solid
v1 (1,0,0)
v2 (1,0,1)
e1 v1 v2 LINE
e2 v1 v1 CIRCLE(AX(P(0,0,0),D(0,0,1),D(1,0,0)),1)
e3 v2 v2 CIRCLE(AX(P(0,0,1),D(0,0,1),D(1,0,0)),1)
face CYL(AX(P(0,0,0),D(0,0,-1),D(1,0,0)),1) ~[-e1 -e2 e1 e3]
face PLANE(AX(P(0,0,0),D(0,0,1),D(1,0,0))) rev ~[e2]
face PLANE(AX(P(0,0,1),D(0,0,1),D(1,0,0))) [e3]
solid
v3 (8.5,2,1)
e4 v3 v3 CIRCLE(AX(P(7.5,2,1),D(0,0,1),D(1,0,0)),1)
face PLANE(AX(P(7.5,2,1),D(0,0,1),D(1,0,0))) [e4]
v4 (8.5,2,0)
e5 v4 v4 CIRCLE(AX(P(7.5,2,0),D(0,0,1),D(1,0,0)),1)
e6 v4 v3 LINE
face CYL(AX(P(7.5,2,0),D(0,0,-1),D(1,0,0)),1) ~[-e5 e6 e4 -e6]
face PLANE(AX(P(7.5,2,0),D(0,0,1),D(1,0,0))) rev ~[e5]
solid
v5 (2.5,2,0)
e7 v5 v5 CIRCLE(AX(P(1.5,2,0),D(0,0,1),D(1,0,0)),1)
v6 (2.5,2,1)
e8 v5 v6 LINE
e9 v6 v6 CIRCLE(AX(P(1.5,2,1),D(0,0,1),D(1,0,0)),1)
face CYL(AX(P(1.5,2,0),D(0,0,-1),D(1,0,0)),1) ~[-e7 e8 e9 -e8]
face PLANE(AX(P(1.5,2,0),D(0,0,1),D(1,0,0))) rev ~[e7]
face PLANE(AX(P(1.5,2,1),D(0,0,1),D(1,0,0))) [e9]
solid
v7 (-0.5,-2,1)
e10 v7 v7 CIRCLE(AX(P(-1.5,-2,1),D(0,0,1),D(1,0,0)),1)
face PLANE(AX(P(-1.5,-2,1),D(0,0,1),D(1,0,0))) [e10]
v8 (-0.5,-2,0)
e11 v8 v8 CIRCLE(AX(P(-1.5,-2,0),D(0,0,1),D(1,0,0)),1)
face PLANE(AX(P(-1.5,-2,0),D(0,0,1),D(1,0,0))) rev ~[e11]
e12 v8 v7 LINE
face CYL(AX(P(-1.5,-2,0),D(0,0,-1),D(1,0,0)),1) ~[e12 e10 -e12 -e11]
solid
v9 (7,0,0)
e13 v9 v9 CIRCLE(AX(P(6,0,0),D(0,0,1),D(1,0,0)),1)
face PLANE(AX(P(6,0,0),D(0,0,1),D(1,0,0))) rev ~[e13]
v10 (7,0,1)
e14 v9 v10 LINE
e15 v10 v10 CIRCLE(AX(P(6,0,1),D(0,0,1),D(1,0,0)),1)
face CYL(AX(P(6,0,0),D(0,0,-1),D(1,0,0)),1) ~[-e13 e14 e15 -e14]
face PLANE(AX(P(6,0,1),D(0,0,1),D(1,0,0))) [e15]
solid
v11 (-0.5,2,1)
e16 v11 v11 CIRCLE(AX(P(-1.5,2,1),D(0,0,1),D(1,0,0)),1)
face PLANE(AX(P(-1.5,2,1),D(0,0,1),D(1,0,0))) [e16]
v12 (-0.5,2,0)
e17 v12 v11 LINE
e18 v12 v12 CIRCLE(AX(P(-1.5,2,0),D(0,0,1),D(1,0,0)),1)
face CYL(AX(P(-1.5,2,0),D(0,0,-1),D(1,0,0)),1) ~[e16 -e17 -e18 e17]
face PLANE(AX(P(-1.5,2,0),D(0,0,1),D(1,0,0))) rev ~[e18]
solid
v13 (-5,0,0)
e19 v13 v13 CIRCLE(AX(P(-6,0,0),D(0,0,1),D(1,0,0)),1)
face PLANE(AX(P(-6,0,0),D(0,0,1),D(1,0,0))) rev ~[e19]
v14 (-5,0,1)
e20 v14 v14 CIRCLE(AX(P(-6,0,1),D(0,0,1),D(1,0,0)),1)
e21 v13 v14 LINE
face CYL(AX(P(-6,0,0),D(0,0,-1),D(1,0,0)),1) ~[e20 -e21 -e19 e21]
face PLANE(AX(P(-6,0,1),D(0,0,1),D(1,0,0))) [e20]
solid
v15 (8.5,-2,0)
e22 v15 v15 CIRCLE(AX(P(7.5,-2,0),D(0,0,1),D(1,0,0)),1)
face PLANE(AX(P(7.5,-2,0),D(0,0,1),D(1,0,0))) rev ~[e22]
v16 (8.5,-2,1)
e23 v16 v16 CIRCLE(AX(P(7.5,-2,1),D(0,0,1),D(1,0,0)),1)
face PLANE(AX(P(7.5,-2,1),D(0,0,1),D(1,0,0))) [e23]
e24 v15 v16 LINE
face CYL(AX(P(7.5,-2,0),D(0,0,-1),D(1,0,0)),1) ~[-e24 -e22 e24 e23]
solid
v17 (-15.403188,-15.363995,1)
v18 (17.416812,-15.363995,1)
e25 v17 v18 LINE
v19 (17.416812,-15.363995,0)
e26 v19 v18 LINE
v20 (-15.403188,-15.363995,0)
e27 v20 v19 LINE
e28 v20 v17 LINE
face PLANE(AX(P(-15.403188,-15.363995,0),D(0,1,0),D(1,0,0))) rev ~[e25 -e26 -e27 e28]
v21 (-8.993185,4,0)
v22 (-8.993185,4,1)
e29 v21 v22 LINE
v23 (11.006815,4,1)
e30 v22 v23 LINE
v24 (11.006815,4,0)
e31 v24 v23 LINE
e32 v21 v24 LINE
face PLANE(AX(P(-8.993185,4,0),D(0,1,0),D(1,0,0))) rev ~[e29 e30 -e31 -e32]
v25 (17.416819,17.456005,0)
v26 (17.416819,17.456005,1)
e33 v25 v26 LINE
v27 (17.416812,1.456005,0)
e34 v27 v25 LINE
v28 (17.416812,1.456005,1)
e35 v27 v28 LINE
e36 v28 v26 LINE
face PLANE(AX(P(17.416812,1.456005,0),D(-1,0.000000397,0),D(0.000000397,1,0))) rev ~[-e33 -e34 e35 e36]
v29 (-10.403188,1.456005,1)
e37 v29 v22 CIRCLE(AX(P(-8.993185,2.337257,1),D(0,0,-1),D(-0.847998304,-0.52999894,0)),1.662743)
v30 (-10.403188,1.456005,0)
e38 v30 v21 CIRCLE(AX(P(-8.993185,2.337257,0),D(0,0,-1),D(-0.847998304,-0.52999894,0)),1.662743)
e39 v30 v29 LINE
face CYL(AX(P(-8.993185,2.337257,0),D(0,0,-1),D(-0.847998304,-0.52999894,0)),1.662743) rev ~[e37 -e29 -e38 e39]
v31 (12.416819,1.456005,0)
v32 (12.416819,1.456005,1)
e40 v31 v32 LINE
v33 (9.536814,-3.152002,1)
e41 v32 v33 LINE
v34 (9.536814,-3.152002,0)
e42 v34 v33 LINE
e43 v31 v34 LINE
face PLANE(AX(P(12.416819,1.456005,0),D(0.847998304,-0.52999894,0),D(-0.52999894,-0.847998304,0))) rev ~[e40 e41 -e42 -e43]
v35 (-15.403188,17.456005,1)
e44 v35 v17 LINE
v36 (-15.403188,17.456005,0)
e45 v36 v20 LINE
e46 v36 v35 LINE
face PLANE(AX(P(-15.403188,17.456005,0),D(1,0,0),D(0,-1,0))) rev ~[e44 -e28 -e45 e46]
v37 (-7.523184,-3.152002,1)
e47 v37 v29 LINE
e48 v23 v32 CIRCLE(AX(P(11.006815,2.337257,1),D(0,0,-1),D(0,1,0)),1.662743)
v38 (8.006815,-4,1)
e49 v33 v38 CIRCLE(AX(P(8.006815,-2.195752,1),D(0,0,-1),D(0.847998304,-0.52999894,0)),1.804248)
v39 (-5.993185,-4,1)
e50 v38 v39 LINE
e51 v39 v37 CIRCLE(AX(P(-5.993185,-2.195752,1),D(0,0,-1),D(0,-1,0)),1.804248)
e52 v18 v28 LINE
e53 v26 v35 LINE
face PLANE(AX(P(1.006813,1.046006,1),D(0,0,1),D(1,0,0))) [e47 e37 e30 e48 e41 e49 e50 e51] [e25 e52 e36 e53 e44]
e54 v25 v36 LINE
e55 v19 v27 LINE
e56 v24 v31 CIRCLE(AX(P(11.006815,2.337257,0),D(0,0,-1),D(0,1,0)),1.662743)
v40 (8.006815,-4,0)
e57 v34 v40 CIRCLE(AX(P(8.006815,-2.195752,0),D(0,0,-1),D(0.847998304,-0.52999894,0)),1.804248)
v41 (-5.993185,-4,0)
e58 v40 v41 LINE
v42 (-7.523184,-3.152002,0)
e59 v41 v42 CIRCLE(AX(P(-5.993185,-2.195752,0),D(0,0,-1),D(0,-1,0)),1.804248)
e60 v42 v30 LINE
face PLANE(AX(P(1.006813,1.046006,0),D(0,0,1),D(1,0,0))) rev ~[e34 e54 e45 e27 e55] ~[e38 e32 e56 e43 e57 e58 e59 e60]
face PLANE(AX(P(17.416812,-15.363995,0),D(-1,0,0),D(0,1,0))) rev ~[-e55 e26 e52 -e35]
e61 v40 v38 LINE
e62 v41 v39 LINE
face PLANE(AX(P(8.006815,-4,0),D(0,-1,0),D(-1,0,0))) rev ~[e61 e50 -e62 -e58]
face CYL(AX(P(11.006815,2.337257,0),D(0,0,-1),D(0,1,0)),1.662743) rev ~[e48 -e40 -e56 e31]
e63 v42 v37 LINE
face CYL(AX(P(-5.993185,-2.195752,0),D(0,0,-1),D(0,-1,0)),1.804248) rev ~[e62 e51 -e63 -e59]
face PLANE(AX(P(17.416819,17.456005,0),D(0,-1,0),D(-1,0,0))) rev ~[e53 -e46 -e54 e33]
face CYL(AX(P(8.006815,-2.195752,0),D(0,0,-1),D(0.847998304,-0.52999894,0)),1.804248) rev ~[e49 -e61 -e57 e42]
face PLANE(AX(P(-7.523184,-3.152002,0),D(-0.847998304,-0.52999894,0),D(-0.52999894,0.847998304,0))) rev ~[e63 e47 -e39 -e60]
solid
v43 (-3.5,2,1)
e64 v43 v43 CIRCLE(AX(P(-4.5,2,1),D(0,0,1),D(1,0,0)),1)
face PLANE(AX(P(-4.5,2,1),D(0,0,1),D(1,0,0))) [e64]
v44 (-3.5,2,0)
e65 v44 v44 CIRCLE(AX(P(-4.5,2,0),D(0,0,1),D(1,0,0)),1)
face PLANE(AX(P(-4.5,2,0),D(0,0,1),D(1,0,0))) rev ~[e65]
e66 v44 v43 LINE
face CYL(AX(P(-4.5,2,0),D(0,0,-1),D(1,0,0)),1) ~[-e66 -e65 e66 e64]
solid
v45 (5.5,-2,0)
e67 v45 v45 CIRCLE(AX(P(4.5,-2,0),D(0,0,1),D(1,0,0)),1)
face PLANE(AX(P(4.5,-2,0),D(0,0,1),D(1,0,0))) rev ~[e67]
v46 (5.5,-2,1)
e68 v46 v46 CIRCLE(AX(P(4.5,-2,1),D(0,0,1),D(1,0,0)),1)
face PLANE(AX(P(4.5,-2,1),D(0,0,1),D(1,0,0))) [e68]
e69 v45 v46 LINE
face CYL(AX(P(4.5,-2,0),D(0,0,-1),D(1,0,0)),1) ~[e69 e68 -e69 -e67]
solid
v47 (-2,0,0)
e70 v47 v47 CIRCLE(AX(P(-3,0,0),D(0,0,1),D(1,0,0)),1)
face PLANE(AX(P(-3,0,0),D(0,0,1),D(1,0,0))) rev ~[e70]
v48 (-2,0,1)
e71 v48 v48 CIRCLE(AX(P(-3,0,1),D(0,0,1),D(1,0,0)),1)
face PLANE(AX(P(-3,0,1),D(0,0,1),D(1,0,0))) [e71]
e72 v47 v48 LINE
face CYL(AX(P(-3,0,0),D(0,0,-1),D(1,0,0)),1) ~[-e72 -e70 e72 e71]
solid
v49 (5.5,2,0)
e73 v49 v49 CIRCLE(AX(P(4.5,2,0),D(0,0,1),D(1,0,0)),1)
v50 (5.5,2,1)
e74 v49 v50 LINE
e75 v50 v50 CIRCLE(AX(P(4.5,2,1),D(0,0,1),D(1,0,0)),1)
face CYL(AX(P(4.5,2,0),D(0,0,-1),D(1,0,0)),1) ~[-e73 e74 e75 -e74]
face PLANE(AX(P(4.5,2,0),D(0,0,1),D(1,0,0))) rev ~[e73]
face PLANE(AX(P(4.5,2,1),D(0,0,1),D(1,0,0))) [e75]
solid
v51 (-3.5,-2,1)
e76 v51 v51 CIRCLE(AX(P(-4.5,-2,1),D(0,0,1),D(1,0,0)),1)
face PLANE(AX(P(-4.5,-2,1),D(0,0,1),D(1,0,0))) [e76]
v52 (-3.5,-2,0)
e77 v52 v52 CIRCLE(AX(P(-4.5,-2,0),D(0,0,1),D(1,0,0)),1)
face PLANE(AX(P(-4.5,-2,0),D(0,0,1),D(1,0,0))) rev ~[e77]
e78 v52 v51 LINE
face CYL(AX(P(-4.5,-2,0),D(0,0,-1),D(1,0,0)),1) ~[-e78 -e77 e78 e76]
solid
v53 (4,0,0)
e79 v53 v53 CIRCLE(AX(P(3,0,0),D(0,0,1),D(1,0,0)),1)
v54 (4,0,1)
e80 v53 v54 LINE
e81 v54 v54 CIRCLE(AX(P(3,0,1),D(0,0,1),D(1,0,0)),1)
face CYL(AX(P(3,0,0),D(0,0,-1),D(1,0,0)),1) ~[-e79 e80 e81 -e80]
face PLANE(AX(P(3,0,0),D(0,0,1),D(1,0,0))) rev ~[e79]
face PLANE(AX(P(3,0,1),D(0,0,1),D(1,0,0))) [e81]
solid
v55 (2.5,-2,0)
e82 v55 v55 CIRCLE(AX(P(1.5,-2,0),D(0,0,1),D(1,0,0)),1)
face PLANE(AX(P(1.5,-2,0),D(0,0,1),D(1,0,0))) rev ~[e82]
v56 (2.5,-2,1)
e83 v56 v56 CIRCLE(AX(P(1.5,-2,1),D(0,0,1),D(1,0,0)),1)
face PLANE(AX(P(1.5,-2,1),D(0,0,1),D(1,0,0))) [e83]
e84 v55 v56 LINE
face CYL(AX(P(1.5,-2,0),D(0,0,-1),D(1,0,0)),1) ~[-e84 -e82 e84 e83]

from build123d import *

# Parameters (mm, degrees)
F0_R     = 1
F1_DEPTH = 1
F2_DEPTH = 1


# Not quite as in the source:
# - ends of sketch curves that miss each other by under 0.0002 mm in the source are joined


with BuildPart() as f1:
    # F0 (on Top) → F1 (new body)
    with BuildSketch(Plane.XY):
        with Locations((-4.5, 2)):
            Circle(F0_R)
    extrude(amount=F1_DEPTH)


with BuildPart() as f1b:
    # F0 (on Top) → F1, piece 2 (new body)
    with BuildSketch(Plane.XY):
        with Locations((-1.5, 2)):
            Circle(F0_R)
    extrude(amount=F1_DEPTH)


with BuildPart() as f1c:
    # F0 (on Top) → F1, piece 3 (new body)
    with BuildSketch(Plane.XY):
        with Locations((1.5, 2)):
            Circle(F0_R)
    extrude(amount=F1_DEPTH)


with BuildPart() as f1d:
    # F0 (on Top) → F1, piece 4 (new body)
    with BuildSketch(Plane.XY):
        with Locations((4.5, 2)):
            Circle(F0_R)
    extrude(amount=F1_DEPTH)


with BuildPart() as f1e:
    # F0 (on Top) → F1, piece 5 (new body)
    with BuildSketch(Plane.XY):
        with Locations((7.5, 2)):
            Circle(F0_R)
    extrude(amount=F1_DEPTH)


with BuildPart() as f1f:
    # F0 (on Top) → F1, piece 6 (new body)
    with BuildSketch(Plane.XY):
        with Locations((6, 0)):
            Circle(F0_R)
    extrude(amount=F1_DEPTH)


with BuildPart() as f1g:
    # F0 (on Top) → F1, piece 7 (new body)
    with BuildSketch(Plane.XY):
        with Locations((3, 0)):
            Circle(F0_R)
    extrude(amount=F1_DEPTH)


with BuildPart() as f1h:
    # F0 (on Top) → F1, piece 8 (new body)
    with BuildSketch(Plane.XY):
        Circle(F0_R)
    extrude(amount=F1_DEPTH)


with BuildPart() as f1i:
    # F0 (on Top) → F1, piece 9 (new body)
    with BuildSketch(Plane.XY):
        with Locations((-3, 0)):
            Circle(F0_R)
    extrude(amount=F1_DEPTH)


with BuildPart() as f1j:
    # F0 (on Top) → F1, piece 10 (new body)
    with BuildSketch(Plane.XY):
        with Locations((-6, 0)):
            Circle(F0_R)
    extrude(amount=F1_DEPTH)


with BuildPart() as f1k:
    # F0 (on Top) → F1, piece 11 (new body)
    with BuildSketch(Plane.XY):
        with Locations((-4.5, -2)):
            Circle(F0_R)
    extrude(amount=F1_DEPTH)


with BuildPart() as f1l:
    # F0 (on Top) → F1, piece 12 (new body)
    with BuildSketch(Plane.XY):
        with Locations((-1.5, -2)):
            Circle(F0_R)
    extrude(amount=F1_DEPTH)


with BuildPart() as f1m:
    # F0 (on Top) → F1, piece 13 (new body)
    with BuildSketch(Plane.XY):
        with Locations((1.5, -2)):
            Circle(F0_R)
    extrude(amount=F1_DEPTH)


with BuildPart() as f1n:
    # F0 (on Top) → F1, piece 14 (new body)
    with BuildSketch(Plane.XY):
        with Locations((4.5, -2)):
            Circle(F0_R)
    extrude(amount=F1_DEPTH)


with BuildPart() as f1o:
    # F0 (on Top) → F1, piece 15 (new body)
    with BuildSketch(Plane.XY):
        with Locations((7.5, -2)):
            Circle(F0_R)
    extrude(amount=F1_DEPTH)


with BuildPart() as f2:
    # F0 (on Top) → F2 (new body)
    with BuildSketch(Plane.XY):
        Polygon((17.4168121663, -15.363994912), (17.4168121663, 1.456005088), (17.4168185263, 17.456005088), (-15.4031878337, 17.456005088), (-15.4031878337, -15.363994912), align=None)
        with BuildLine():
            Line((-8.9931846537, 4), (0.0068153463, 4))
            Line((0.0068153463, 4), (11.0068153463, 4))
            ThreePointArc((11.0068153463, 4), (12.4611209434, 3.1433025227), (12.4168185263, 1.456005088))
            Line((12.4168185263, 1.456005088), (9.5368142863, -3.152001696))
            ThreePointArc((9.5368142863, -3.152001696), (8.8814578275, -3.7738239924), (8.0068153463, -4))
            Line((8.0068153463, -4), (-5.9931846537, -4))
            ThreePointArc((-5.9931846537, -4), (-6.867827135, -3.7738239924), (-7.5231835937, -3.152001696))
            Line((-7.5231835937, -3.152001696), (-10.4031878337, 1.456005088))
            ThreePointArc((-10.4031878337, 1.456005088), (-10.4474902509, 3.1433025227), (-8.9931846537, 4))
        make_face(mode=Mode.SUBTRACT)
    extrude(amount=F2_DEPTH)


solid = Compound([f1.part, f1b.part, f1c.part, f1d.part, f1e.part, f1f.part, f1g.part, f1h.part, f1i.part, f1j.part, f1k.part, f1l.part, f1m.part, f1n.part, f1o.part, f2.part])
